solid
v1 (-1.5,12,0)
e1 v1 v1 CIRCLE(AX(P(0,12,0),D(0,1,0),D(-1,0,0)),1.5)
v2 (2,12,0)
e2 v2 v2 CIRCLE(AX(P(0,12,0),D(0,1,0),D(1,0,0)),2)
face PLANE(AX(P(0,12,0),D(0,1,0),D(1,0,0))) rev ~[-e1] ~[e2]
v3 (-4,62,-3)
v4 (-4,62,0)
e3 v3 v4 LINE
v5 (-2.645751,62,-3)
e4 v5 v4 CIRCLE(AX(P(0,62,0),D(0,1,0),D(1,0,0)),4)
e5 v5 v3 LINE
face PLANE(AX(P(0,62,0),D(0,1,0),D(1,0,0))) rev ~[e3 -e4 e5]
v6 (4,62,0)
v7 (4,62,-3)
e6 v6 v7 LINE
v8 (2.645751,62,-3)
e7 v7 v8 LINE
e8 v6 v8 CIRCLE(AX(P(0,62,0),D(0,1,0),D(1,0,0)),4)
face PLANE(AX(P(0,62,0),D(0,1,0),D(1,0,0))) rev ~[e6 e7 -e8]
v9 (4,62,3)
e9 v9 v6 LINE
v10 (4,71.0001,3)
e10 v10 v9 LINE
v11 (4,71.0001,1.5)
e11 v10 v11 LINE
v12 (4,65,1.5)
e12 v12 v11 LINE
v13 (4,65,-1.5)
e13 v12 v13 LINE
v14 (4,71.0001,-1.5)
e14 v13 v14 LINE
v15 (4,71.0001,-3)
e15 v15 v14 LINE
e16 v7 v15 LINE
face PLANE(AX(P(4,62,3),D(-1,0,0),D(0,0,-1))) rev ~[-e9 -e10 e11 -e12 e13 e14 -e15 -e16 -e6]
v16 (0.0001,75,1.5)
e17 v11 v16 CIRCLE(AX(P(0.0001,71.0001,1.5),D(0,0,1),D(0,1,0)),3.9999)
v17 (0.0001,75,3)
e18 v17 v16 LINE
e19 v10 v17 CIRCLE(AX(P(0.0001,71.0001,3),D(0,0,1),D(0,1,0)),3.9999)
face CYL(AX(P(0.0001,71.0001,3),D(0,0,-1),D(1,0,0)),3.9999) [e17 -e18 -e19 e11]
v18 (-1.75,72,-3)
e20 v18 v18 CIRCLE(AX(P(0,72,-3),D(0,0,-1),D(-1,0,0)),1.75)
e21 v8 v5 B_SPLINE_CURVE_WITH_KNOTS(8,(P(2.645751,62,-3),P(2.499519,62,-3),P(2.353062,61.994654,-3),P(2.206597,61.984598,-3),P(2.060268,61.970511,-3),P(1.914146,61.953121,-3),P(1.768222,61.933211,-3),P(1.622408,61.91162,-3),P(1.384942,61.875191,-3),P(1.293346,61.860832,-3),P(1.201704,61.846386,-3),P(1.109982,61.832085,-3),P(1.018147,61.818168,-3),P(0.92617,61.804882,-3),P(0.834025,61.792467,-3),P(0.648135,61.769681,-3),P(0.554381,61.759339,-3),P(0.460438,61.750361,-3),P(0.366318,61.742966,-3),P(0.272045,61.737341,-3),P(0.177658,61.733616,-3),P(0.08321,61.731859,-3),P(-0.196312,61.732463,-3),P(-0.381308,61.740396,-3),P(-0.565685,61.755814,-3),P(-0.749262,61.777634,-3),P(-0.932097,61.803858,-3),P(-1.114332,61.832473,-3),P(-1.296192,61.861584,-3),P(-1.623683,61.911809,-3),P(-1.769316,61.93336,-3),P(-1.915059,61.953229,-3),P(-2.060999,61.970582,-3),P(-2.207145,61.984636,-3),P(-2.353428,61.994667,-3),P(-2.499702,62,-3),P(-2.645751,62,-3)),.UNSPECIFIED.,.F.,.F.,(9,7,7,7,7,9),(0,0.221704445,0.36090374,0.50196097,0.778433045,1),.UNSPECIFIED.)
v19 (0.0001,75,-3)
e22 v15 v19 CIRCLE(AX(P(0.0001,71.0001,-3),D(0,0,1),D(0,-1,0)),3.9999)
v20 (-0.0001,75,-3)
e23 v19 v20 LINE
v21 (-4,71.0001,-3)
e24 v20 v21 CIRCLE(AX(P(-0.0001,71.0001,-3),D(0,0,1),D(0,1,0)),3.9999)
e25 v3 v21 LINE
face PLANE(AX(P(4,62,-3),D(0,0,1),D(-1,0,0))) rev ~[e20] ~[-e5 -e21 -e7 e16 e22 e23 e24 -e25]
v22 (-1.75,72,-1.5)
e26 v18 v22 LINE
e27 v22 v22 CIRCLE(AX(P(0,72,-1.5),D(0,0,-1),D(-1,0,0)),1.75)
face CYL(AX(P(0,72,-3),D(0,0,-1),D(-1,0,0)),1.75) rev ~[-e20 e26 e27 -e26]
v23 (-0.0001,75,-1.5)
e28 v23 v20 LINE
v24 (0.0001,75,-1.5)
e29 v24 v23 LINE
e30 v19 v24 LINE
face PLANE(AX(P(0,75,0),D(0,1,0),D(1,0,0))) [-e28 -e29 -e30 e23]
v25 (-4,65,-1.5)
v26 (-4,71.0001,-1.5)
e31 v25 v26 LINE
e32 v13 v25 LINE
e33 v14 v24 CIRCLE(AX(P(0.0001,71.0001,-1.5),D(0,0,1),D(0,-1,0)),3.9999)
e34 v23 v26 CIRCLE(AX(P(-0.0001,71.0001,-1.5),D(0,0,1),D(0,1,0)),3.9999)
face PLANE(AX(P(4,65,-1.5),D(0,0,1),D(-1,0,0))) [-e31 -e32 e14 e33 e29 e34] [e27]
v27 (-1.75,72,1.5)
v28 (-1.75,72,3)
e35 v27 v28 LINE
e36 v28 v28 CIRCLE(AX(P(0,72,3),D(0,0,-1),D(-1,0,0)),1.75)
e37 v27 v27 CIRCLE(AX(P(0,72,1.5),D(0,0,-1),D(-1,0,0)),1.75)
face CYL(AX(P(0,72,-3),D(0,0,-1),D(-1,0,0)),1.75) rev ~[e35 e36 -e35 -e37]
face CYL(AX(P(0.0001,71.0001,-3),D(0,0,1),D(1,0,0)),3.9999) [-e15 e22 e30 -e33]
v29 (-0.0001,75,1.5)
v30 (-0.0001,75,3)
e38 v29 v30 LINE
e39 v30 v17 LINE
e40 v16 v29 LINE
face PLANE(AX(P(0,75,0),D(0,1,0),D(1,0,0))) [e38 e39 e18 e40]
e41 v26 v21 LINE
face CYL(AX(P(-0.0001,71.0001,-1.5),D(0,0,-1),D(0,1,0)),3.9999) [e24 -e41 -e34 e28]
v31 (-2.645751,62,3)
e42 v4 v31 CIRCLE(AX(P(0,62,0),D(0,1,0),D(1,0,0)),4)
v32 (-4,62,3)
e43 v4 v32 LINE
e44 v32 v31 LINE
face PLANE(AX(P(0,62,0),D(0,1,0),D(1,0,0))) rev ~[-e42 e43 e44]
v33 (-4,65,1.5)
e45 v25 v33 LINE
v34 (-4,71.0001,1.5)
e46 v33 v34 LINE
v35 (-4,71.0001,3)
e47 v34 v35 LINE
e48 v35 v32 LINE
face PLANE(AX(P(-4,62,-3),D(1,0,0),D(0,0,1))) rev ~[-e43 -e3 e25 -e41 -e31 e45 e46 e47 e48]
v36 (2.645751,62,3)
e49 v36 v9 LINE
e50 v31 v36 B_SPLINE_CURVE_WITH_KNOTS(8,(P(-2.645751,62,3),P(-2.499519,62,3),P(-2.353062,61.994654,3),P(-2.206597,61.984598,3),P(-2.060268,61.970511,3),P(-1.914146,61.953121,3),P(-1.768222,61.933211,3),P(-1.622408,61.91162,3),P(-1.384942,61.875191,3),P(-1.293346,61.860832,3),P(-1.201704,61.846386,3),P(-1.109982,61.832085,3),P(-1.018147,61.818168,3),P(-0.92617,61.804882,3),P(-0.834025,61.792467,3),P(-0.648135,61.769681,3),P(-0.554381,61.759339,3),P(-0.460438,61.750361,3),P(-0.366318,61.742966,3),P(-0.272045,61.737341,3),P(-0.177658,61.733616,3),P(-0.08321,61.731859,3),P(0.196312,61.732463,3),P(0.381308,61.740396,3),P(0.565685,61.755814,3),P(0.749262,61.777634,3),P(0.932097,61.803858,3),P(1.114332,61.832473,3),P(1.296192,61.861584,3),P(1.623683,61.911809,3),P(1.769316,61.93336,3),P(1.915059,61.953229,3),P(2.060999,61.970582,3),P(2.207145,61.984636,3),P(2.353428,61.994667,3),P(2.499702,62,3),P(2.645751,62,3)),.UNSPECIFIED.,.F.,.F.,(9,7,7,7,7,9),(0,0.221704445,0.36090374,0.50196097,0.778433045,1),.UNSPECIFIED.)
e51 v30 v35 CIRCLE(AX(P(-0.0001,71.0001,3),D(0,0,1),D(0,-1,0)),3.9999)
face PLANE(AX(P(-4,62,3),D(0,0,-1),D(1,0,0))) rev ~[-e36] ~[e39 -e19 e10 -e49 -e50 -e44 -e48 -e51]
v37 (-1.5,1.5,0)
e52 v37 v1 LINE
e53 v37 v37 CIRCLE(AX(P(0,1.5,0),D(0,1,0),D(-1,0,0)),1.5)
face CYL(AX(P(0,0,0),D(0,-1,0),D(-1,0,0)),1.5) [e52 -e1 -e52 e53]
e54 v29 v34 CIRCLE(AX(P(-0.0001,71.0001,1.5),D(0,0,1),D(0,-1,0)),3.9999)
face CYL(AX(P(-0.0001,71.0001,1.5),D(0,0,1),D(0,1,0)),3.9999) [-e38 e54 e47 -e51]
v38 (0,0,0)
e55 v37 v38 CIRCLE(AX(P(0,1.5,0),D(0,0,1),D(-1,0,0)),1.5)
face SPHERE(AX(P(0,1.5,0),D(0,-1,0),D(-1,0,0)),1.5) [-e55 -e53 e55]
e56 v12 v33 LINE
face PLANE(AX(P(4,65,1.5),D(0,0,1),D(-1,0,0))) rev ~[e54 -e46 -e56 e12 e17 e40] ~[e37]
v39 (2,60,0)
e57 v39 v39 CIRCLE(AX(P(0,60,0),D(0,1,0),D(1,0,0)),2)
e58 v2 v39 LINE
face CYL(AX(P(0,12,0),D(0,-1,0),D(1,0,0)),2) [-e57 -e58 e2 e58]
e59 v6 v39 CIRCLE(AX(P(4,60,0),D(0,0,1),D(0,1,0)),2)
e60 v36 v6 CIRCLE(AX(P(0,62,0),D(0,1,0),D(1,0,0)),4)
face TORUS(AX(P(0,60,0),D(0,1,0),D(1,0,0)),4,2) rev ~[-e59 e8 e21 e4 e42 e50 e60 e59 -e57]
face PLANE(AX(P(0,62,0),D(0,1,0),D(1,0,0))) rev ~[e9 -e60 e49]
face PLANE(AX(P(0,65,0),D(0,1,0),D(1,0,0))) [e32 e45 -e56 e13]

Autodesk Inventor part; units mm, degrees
ref_plane "YZ Plane" through (0, 0, 0) normal (1, 0, 0) x (0, 1, 0)
ref_plane "XZ Plane" through (0, 0, 0) normal (0, 1, 0) x (-1, 0, 0)
ref_plane "XY Plane" through (0, 0, 0) normal (0, 0, 1) x (1, 0, 0)
sketch "Sketch1" plane through (0, 0, 0) normal (0, 1, 0) x (-1, 0, 0)
  circle A0 centre (0, 0) radius 1.5
  dimension "d0" = 3
extrude "Extrusion1" add sketch "Sketch1" along normal blind 12
sketch "Sketch2" plane through (0, 12, 0) normal (0, 1, 0) x (1, 0, 0)
  circle A0 centre (0, 0) radius 2
  dimension "d3" = 4
extrude "Extrusion2" add sketch "Sketch2" along normal blind 50
thread "Thread1" size "M4x0.7" class "6g" standard "ANSI Metric M Profile" length 20.5 offset 30
fillet "Fillet1" radius 1.5 1 edges at (1.5, 0, 0)
sketch "Sketch6" plane through (0, 62, 0) normal (0, 1, 0) x (1, 0, 0)
  line L0 (4, 3) -> (-4, 3)
  line L1 (-4, 3) -> (-4, -3)
  line L2 (-4, -3) -> (4, -3)
  line L3 (4, -3) -> (4, 3)
  line L4 (4, 3) -> (-4, -3) construction
  line L5 (-4, 3) -> (4, -3) construction
  point P0 (0, 0)
  point P1 (0, 0)
  dimension "d49" = 8
  dimension "d50" = 6
  dimension "d51" = 4
  dimension "d52" = 3
  dimension "d53" = 4
  dimension "d54" = 3
extrude "Extrusion6" add sketch "Sketch6" along normal blind 3
sketch "Sketch7" plane through (0, 65, 0) normal (0, 1, 0) x (1, 0, 0)
  line L0 (-4, -3) -> (4, -3)
  line L1 (4, -3) -> (4, -1.5)
  line L2 (4, -1.5) -> (-4, -1.5)
  line L3 (-4, -1.5) -> (-4, -3)
  line L4 (4, 3) -> (-4, 3)
  line L5 (-4, 3) -> (4, 3)
  line L6 (4, 3) -> (4, 1.5)
  line L7 (4, 1.5) -> (-4, 1.5)
  line L8 (-4, 1.5) -> (-4, 3)
  point P0 (0, 0)
  point P1 (0, 0)
  dimension "d57" = 1.5
  dimension "d58" = 1.5
  dimension "d59" = 4.5
  dimension "d60" = 8
  dimension "d61" = 8
  dimension "d62" = 3
  dimension "d63" = 4
  dimension "d64" = 0
  dimension "d65" = 4
  dimension "d66" = 3
extrude "Extrusion7" add sketch "Sketch7" along normal blind 10
sketch "Sketch8" plane through (4, 62, -3) normal (0, 0, -1) x (-1, 0, 0)
  line L0 (8, 0) -> (0, 0)
  circle A0 centre (4, 10) radius 1.75
  point P0 (4, -62)
  point P1 (4, -62)
  dimension "d69" = 3.5
  dimension "d70" = 62
  dimension "d71" = 10
  dimension "d72" = 62
  dimension "d73" = 62.1289
  dimension "d74" = 72
  dimension "d75" = 0
  dimension "d76" = 62.1289
extrude "Extrusion8" cut sketch "Sketch8" against normal through all
fillet "Fillet5" radius 4 4 edges at (-4, 75, -2.25) (-4, 75, 2.25) (4, 75, -2.25) (4, 75, 2.25)
fillet "Fillet6" radius 2 1 edges at (-2, 62, 0)
properties part number "reverse gear steam chest rod valve 1"
